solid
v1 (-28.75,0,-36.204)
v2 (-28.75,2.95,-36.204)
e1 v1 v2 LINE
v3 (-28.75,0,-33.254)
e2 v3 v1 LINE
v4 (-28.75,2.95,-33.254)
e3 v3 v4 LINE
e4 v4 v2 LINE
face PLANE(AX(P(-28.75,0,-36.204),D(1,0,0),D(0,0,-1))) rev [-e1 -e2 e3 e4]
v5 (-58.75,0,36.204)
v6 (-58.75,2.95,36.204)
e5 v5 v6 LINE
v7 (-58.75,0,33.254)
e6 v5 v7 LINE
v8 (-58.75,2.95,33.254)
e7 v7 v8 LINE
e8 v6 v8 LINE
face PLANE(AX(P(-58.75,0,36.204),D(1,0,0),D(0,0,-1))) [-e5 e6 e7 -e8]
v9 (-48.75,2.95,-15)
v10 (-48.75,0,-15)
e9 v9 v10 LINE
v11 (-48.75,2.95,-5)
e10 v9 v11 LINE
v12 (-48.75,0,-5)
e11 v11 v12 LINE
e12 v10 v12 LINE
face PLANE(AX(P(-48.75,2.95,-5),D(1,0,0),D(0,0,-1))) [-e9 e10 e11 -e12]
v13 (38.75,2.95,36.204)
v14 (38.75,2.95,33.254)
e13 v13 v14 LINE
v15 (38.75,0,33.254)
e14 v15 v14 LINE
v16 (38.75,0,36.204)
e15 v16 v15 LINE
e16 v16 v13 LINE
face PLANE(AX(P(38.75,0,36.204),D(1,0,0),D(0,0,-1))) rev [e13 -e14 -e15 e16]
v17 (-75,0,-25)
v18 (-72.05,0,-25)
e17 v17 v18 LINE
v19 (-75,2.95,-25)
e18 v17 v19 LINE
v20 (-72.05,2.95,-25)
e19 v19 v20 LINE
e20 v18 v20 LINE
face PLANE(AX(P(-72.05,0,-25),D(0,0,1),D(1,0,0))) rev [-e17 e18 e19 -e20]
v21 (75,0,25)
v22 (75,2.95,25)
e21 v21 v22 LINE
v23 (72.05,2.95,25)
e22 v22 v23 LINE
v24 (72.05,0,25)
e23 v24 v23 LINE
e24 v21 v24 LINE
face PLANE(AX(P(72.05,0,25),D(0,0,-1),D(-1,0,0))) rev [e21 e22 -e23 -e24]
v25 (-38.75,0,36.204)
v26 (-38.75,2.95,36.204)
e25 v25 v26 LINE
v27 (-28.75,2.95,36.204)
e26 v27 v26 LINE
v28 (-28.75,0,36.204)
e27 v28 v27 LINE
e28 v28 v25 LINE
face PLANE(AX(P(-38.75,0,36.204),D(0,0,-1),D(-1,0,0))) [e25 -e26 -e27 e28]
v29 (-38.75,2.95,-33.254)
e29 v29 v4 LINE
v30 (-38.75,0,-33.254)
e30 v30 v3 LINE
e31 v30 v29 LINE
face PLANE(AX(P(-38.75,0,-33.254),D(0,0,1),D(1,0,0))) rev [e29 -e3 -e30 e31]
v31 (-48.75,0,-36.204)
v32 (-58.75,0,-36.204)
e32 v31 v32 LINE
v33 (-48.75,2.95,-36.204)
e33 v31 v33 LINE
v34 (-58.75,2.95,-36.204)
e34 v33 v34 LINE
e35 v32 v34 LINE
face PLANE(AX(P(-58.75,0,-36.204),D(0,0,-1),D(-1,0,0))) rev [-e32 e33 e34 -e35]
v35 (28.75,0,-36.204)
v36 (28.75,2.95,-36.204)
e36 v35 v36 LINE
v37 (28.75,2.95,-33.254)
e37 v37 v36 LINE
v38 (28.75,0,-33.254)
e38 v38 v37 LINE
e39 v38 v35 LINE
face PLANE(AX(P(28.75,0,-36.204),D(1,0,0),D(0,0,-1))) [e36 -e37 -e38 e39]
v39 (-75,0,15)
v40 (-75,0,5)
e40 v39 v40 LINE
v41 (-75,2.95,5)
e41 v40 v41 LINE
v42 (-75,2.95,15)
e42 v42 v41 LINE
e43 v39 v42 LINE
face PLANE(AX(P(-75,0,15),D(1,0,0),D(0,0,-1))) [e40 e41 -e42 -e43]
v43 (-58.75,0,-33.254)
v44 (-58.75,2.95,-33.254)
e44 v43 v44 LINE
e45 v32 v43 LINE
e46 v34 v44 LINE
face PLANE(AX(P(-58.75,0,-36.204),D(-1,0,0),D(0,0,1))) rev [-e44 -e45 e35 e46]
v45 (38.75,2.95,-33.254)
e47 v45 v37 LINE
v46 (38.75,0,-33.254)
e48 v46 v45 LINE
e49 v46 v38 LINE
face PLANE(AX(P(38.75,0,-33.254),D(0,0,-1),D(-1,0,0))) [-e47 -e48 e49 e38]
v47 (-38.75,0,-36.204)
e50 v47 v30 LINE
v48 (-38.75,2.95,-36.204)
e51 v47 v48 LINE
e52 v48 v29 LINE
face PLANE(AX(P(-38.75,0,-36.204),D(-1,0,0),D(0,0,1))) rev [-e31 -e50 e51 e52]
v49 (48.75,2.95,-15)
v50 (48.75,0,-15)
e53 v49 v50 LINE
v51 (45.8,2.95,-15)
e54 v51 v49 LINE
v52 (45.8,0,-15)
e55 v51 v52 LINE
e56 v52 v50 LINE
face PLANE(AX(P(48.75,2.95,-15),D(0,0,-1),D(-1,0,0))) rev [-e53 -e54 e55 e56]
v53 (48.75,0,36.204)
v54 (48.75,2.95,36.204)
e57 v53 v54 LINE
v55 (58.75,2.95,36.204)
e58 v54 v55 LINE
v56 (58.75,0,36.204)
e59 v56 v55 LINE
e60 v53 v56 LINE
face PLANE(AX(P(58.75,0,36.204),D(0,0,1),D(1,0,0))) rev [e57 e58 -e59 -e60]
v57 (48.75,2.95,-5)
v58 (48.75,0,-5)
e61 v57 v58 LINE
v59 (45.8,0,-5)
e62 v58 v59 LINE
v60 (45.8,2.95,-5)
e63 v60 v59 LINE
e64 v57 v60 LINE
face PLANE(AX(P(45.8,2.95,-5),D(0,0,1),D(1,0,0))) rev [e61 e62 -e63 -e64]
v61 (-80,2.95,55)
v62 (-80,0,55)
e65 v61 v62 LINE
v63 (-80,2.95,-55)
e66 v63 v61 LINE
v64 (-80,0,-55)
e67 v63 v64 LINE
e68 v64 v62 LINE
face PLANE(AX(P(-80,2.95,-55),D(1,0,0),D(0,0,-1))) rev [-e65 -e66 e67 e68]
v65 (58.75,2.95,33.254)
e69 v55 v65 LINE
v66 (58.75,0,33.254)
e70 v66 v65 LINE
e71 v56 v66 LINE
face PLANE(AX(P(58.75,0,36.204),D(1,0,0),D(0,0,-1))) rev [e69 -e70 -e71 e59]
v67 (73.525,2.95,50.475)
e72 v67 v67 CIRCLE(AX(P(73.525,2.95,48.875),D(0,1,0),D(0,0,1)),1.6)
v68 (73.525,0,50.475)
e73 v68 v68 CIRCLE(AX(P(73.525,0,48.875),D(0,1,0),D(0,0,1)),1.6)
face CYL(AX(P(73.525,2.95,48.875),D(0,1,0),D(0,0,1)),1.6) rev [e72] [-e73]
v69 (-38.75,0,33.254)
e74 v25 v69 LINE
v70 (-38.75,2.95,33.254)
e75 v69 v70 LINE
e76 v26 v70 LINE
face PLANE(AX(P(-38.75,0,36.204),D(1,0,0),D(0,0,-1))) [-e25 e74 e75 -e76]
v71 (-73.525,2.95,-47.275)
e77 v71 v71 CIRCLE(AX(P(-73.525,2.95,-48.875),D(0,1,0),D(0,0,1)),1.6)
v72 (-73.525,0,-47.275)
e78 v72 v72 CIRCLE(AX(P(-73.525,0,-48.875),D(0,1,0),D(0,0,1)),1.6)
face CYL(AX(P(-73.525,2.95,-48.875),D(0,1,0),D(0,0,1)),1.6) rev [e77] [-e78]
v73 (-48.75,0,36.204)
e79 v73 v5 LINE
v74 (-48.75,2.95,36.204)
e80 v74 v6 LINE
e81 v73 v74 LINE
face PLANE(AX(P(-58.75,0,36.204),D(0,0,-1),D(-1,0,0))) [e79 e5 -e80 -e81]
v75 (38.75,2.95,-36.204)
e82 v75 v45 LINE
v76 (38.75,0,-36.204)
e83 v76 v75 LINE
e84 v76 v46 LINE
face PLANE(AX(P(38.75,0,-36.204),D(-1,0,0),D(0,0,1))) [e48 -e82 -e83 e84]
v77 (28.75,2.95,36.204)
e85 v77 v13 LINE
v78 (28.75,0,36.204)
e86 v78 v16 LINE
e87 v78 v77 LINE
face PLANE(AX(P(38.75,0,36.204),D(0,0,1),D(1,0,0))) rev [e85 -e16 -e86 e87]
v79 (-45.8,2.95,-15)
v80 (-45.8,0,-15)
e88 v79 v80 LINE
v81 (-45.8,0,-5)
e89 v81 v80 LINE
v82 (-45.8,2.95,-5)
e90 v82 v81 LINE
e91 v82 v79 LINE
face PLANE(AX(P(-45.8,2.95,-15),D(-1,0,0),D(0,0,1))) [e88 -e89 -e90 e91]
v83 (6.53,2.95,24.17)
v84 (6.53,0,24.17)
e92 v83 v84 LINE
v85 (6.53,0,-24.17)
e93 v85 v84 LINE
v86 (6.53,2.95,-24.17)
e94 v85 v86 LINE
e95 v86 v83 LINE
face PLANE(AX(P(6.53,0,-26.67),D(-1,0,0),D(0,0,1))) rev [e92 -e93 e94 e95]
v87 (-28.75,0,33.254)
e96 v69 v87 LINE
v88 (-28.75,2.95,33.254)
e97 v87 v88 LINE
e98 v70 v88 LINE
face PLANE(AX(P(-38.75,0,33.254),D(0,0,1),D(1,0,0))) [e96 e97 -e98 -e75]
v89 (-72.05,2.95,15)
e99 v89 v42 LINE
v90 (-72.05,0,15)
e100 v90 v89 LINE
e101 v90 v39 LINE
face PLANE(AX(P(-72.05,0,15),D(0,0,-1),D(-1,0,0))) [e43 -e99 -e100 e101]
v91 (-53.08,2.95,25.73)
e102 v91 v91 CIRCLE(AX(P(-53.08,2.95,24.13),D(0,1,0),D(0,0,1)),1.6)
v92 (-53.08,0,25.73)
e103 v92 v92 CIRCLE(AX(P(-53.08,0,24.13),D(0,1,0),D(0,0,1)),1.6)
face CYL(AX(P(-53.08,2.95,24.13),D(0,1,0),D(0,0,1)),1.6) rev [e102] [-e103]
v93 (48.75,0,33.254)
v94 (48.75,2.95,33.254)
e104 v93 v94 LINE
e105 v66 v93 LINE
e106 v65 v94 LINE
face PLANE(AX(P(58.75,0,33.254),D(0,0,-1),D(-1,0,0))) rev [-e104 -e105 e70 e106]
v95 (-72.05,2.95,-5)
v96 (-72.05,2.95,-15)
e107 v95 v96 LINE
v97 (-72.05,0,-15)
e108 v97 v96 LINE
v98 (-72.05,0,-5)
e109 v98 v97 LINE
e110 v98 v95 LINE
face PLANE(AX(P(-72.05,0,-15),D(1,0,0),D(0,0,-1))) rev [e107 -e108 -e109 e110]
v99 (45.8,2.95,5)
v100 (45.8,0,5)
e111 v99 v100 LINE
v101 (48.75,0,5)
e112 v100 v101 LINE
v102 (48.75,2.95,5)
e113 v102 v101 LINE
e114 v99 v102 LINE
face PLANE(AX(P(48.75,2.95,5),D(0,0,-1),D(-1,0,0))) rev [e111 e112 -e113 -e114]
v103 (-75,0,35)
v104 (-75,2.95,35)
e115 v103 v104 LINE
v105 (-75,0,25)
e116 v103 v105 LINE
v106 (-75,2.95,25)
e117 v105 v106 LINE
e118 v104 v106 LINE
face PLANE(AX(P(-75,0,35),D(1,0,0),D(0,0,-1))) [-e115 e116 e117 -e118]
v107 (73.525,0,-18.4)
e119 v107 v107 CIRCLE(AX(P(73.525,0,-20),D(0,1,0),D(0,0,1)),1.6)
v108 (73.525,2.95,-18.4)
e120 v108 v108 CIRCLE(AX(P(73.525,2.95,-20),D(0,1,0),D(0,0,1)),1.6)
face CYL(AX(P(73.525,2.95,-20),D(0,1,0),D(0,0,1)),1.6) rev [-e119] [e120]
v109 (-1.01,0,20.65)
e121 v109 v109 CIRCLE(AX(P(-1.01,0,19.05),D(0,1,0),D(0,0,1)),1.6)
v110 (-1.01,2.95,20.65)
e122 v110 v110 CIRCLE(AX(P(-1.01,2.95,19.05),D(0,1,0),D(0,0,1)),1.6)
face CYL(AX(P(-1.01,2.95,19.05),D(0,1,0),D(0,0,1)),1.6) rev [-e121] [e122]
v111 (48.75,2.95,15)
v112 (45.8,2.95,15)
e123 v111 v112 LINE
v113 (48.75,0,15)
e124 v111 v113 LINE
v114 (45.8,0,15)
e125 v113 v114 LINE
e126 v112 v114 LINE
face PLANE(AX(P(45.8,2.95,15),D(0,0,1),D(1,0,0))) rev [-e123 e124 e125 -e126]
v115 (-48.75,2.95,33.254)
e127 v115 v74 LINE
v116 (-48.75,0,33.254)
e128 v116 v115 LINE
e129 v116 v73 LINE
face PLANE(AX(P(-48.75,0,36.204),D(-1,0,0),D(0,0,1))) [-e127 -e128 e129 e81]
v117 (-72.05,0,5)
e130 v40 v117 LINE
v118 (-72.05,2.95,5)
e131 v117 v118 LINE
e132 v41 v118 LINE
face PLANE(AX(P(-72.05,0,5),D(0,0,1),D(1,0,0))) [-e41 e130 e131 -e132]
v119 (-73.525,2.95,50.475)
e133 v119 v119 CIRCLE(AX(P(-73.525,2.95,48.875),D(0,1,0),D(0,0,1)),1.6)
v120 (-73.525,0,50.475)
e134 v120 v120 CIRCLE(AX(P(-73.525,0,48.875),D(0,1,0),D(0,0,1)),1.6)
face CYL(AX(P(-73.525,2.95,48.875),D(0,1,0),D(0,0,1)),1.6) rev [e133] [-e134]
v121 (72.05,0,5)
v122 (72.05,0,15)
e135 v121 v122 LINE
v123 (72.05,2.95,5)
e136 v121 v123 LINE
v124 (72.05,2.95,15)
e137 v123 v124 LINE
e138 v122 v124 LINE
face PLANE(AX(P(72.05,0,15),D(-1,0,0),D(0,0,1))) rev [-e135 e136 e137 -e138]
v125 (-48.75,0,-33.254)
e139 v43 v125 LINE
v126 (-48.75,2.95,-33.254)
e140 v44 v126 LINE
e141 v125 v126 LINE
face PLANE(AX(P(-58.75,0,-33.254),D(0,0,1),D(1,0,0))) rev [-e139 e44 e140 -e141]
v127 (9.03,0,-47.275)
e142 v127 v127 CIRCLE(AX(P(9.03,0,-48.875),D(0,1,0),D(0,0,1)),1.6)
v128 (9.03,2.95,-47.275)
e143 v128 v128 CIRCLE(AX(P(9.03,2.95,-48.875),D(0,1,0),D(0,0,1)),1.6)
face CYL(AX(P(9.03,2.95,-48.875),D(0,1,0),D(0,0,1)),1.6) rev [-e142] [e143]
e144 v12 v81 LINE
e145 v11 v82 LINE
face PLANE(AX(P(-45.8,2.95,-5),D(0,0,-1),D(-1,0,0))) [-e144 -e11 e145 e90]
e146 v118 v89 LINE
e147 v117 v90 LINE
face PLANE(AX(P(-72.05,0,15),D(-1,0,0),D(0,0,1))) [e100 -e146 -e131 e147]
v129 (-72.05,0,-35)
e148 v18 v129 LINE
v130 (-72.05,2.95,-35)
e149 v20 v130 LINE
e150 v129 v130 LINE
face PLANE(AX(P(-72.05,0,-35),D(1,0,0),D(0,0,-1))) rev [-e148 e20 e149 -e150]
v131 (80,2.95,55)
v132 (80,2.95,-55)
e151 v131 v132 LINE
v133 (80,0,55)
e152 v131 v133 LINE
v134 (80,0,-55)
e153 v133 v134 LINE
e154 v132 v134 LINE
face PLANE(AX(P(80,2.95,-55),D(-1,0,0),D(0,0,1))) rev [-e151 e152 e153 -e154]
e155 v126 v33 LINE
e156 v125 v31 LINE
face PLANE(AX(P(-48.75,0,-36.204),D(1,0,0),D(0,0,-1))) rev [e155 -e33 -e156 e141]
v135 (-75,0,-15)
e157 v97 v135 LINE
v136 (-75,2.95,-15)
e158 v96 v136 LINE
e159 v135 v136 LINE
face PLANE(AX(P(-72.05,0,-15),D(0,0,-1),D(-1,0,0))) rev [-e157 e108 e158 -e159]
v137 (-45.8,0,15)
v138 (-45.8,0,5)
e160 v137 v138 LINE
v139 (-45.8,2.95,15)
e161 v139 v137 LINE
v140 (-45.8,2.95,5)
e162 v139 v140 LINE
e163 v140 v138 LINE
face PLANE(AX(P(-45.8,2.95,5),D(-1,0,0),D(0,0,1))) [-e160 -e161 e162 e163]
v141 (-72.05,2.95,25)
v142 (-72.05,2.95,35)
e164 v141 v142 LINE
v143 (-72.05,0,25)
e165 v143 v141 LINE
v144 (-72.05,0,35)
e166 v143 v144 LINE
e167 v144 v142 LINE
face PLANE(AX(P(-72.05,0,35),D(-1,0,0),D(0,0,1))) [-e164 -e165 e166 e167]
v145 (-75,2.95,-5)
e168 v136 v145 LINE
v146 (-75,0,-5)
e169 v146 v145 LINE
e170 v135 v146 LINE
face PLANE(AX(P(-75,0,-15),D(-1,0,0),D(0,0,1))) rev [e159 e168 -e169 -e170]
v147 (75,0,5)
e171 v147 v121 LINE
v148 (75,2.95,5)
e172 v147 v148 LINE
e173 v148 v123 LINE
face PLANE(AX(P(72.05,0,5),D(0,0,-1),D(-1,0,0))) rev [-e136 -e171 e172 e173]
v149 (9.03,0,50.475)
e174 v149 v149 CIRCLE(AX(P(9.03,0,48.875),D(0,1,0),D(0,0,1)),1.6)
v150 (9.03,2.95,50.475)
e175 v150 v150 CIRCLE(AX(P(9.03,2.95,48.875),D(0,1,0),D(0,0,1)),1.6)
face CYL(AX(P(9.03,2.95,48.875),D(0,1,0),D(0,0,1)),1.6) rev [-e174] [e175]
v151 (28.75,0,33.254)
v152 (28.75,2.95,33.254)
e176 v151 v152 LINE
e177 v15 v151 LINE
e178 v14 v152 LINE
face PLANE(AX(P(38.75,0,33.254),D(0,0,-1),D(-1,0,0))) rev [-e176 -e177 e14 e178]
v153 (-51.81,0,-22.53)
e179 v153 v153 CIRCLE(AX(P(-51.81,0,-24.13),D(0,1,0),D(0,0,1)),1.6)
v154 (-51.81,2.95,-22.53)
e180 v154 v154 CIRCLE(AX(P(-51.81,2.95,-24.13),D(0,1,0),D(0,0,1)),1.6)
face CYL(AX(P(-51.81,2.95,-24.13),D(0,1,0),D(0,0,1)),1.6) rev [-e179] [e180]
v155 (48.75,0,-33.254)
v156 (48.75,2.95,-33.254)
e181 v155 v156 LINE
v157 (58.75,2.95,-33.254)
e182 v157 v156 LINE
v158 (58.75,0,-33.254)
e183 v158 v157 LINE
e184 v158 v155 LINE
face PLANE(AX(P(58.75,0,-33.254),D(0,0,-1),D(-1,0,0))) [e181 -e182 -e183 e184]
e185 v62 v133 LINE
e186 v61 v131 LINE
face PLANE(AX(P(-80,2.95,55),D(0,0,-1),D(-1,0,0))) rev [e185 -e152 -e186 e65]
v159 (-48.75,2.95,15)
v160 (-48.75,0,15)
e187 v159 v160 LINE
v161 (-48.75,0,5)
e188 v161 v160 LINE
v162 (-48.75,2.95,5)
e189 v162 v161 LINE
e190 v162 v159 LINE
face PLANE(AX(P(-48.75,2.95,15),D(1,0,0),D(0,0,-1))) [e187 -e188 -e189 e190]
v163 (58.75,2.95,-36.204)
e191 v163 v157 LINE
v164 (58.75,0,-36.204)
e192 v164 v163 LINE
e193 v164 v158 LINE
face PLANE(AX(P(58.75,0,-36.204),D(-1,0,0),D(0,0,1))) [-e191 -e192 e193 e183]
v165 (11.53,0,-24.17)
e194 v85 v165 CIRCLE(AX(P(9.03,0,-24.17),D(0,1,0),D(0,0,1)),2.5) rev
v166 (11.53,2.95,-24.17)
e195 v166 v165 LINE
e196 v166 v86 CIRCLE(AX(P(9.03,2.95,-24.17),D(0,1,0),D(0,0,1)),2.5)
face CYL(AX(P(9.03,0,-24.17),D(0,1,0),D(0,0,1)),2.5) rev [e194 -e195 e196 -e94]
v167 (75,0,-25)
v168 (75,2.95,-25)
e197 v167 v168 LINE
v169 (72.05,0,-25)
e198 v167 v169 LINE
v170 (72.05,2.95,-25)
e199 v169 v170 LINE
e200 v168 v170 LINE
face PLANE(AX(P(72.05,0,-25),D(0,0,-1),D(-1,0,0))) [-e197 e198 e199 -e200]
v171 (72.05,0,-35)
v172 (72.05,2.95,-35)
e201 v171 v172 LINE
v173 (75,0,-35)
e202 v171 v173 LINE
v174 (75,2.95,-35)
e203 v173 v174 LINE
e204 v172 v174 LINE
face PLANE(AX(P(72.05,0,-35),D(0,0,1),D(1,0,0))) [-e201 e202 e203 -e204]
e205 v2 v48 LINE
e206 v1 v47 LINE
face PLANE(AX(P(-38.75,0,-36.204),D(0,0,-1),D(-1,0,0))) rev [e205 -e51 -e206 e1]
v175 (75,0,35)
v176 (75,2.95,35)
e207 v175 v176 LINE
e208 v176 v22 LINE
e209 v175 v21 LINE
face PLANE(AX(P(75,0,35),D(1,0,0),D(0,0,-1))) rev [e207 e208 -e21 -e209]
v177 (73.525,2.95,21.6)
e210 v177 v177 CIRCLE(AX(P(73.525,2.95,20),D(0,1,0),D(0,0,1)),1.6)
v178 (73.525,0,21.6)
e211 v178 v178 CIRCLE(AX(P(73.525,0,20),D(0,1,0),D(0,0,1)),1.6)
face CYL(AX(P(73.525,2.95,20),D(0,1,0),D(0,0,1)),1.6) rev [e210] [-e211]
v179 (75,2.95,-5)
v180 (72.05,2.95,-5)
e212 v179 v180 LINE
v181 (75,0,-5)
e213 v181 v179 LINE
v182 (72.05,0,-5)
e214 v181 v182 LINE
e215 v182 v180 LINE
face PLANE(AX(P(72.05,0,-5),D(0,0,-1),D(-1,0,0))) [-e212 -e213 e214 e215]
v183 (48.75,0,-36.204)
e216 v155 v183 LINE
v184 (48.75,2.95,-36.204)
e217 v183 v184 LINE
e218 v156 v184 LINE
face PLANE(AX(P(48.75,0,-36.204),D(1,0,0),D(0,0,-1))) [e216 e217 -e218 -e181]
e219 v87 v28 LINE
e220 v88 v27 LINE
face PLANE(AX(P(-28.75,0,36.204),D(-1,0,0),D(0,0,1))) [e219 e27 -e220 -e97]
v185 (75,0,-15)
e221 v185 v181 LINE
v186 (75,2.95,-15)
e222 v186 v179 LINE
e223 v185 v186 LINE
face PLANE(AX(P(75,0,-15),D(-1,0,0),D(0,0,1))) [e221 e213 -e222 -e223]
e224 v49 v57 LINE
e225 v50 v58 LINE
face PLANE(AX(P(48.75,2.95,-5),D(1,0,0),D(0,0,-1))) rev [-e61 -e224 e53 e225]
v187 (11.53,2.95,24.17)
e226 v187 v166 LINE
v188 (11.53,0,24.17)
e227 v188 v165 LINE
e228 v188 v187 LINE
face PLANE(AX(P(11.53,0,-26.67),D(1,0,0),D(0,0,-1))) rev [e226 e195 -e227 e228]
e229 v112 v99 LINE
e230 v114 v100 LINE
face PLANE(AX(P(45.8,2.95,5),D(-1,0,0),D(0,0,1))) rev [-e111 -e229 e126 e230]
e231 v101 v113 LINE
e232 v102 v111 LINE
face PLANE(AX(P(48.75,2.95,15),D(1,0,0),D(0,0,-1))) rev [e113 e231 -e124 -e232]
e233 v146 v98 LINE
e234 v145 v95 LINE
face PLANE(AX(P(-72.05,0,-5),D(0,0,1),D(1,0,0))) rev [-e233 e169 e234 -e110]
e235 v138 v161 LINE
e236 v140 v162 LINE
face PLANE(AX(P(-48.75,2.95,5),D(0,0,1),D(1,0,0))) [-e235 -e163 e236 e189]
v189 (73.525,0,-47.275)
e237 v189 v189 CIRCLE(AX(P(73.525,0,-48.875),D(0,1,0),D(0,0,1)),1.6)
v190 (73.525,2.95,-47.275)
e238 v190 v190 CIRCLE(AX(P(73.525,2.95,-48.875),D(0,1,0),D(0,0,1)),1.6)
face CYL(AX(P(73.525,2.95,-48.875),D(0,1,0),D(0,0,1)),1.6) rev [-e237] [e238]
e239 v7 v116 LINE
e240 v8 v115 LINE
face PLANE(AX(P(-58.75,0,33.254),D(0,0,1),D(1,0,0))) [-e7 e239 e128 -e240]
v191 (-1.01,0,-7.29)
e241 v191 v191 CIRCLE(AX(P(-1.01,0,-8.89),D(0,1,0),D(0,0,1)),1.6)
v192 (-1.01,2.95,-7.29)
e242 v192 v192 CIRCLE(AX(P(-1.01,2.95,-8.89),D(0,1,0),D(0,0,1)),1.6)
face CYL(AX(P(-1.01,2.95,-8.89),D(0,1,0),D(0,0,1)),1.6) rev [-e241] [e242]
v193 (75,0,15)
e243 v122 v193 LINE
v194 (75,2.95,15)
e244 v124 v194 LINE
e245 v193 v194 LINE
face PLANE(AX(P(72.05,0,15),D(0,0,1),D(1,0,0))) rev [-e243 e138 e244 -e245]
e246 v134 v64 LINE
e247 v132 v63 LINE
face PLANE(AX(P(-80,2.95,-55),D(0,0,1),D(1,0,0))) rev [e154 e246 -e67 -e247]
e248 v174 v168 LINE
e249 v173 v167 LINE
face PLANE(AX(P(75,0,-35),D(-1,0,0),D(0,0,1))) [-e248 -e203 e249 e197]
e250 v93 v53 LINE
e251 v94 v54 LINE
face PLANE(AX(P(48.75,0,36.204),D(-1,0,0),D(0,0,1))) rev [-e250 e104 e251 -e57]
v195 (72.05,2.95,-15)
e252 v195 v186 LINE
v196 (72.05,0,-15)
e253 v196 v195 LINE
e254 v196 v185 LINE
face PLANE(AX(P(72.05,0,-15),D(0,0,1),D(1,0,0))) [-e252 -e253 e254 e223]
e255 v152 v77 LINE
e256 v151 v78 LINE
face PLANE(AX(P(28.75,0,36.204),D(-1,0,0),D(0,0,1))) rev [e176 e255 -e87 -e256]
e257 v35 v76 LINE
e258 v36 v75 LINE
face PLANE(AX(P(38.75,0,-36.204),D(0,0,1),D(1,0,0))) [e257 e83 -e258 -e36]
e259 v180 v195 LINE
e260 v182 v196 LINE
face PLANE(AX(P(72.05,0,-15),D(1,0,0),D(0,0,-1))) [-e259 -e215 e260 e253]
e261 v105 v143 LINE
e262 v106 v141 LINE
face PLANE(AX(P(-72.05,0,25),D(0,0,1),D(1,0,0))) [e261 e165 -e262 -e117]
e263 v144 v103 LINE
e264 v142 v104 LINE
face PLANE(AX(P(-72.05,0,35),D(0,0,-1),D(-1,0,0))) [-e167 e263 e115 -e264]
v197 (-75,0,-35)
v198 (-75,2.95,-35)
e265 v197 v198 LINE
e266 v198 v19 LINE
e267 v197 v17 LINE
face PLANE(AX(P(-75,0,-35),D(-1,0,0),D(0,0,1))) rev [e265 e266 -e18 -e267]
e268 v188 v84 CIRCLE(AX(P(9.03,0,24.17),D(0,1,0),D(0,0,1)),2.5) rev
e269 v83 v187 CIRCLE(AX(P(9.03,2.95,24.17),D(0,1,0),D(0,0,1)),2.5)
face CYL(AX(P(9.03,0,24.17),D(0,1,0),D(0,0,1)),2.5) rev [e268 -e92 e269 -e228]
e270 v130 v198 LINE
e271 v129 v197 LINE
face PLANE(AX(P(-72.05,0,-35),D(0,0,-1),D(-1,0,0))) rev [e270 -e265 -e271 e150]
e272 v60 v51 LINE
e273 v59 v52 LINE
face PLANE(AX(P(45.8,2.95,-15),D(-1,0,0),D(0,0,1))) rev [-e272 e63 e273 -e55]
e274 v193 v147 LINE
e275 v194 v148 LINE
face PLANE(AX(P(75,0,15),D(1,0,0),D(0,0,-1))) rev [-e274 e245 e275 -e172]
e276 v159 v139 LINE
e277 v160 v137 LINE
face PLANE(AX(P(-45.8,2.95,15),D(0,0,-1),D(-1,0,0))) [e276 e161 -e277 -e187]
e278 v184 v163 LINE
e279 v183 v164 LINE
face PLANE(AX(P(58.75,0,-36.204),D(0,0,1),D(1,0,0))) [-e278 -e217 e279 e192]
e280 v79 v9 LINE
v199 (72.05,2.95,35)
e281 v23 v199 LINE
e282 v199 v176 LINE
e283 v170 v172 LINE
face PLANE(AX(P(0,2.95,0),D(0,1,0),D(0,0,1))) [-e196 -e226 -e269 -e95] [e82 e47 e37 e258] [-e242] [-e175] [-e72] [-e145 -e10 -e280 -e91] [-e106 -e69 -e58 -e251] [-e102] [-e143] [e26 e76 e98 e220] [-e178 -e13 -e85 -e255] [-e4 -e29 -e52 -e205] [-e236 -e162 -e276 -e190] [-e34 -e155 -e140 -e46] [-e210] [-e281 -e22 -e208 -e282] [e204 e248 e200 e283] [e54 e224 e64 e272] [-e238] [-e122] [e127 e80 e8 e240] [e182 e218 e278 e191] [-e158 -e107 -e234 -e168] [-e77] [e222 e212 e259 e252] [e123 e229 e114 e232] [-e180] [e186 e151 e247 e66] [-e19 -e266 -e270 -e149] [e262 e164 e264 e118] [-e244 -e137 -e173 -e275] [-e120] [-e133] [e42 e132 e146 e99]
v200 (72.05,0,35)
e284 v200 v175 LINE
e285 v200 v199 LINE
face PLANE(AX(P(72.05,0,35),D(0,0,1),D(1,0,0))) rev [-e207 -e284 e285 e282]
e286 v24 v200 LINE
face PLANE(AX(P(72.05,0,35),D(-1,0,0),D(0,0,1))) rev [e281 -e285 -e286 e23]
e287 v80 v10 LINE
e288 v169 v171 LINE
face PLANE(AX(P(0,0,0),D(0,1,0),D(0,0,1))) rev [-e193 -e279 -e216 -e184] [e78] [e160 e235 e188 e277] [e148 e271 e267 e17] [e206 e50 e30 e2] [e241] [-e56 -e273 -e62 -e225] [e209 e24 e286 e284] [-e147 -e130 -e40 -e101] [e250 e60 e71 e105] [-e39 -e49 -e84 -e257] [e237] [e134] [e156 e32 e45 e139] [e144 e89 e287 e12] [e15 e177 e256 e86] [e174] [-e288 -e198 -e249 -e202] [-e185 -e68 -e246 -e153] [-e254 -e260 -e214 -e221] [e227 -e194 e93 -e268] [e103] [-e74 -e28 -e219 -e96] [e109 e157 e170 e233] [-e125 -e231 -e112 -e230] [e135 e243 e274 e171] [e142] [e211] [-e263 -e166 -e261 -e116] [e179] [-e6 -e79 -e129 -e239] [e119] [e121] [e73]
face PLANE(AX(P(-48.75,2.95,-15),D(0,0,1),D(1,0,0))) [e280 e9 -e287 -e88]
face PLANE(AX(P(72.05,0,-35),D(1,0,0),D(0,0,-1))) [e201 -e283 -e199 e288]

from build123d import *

# Parameters (mm, degrees)
BOTTOM_PLATE_OUTLINE_W   = 160
BOTTOM_PLATE_OUTLINE_H   = 110
BOTTOM_PLATE_OUTLINE_R   = 1.6
BOTTOM_PLATE_OUTLINE_W_2 = 2.95
BOTTOM_PLATE_OUTLINE_H_2 = 10
BOTTOM_PLATE_OUTLINE_W_3 = 10
BOTTOM_PLATE_OUTLINE_H_3 = 2.95
BOTTOM_PLATE_DEPTH       = 2.95
M3_CLEARANCE_HOLE1_D     = 3.2
SKETCH6_W                = 5
SKETCH6_H                = 53.34
CUT_EXTRUDE1_DEPTH       = 98.127249009
FILLET1_R                = 2.5
FILLET2_R                = 2.5
M3_CLEARANCE_HOLE2_D     = 3.2
M3_CLEARANCE_HOLE3_D     = 3.2
SKETCH12_W               = 2.95
SKETCH12_H               = 10
CUT_EXTRUDE4_DEPTH       = 98.127249009


# Read off the part's stored shape, not the designer's step: Bottom Plate
with BuildPart() as part:
    # Bottom Plate outline → Bottom Plate (new body)
    with BuildSketch(Plane(origin=(0, 0, 0), x_dir=(1, 0, 0), z_dir=(0, 1, 0))):
        Rectangle(BOTTOM_PLATE_OUTLINE_W, BOTTOM_PLATE_OUTLINE_H)
        with Locations((-73.525, -48.875)):
            Circle(BOTTOM_PLATE_OUTLINE_R, mode=Mode.SUBTRACT)
        with Locations((-73.525, -30)):
            Rectangle(BOTTOM_PLATE_OUTLINE_W_2, BOTTOM_PLATE_OUTLINE_H_2, mode=Mode.SUBTRACT)
        with Locations((-53.75, -34.729)):
            Rectangle(BOTTOM_PLATE_OUTLINE_W_3, BOTTOM_PLATE_OUTLINE_H_3, mode=Mode.SUBTRACT)
        with Locations((-33.75, -34.729)):
            Rectangle(BOTTOM_PLATE_OUTLINE_W_3, BOTTOM_PLATE_OUTLINE_H_3, mode=Mode.SUBTRACT)
        with Locations((-73.525, -10)):
            Rectangle(BOTTOM_PLATE_OUTLINE_W_2, BOTTOM_PLATE_OUTLINE_H_2, mode=Mode.SUBTRACT)
        with Locations((33.75, -34.729)):
            Rectangle(BOTTOM_PLATE_OUTLINE_W_3, BOTTOM_PLATE_OUTLINE_H_3, mode=Mode.SUBTRACT)
        with Locations((73.525, -48.875)):
            Circle(BOTTOM_PLATE_OUTLINE_R, mode=Mode.SUBTRACT)
        with Locations((53.75, -34.729)):
            Rectangle(BOTTOM_PLATE_OUTLINE_W_3, BOTTOM_PLATE_OUTLINE_H_3, mode=Mode.SUBTRACT)
        with Locations((73.525, -30)):
            Rectangle(BOTTOM_PLATE_OUTLINE_W_2, BOTTOM_PLATE_OUTLINE_H_2, mode=Mode.SUBTRACT)
        with Locations((73.525, -10)):
            Rectangle(BOTTOM_PLATE_OUTLINE_W_2, BOTTOM_PLATE_OUTLINE_H_2, mode=Mode.SUBTRACT)
        with Locations((-73.525, 10)):
            Rectangle(BOTTOM_PLATE_OUTLINE_W_2, BOTTOM_PLATE_OUTLINE_H_2, mode=Mode.SUBTRACT)
        with Locations((-73.525, 30)):
            Rectangle(BOTTOM_PLATE_OUTLINE_W_2, BOTTOM_PLATE_OUTLINE_H_2, mode=Mode.SUBTRACT)
        with Locations((-53.75, 34.729)):
            Rectangle(BOTTOM_PLATE_OUTLINE_W_3, BOTTOM_PLATE_OUTLINE_H_3, mode=Mode.SUBTRACT)
        with Locations((-73.525, 48.875)):
            Circle(BOTTOM_PLATE_OUTLINE_R, mode=Mode.SUBTRACT)
        with Locations((-33.75, 34.729)):
            Rectangle(BOTTOM_PLATE_OUTLINE_W_3, BOTTOM_PLATE_OUTLINE_H_3, mode=Mode.SUBTRACT)
        with Locations((73.525, 10)):
            Rectangle(BOTTOM_PLATE_OUTLINE_W_2, BOTTOM_PLATE_OUTLINE_H_2, mode=Mode.SUBTRACT)
        with Locations((33.75, 34.729)):
            Rectangle(BOTTOM_PLATE_OUTLINE_W_3, BOTTOM_PLATE_OUTLINE_H_3, mode=Mode.SUBTRACT)
        with Locations((53.75, 34.729)):
            Rectangle(BOTTOM_PLATE_OUTLINE_W_3, BOTTOM_PLATE_OUTLINE_H_3, mode=Mode.SUBTRACT)
        with Locations((73.525, 30)):
            Rectangle(BOTTOM_PLATE_OUTLINE_W_2, BOTTOM_PLATE_OUTLINE_H_2, mode=Mode.SUBTRACT)
        with Locations((73.525, 48.875)):
            Circle(BOTTOM_PLATE_OUTLINE_R, mode=Mode.SUBTRACT)
    extrude(amount=BOTTOM_PLATE_DEPTH)

    # M3 Clearance Hole1 (through all)
    with Locations(Plane(origin=(0, 2.95, 0), x_dir=(1, 0, 0), z_dir=(0, 1, 0))):
        with Locations((-51.81, 24.13), (-53.08, -24.13), (-1.01, -19.05), (-1.01, 8.89)):
            Hole(M3_CLEARANCE_HOLE1_D / 2)

    # Sketch6 → Cut-Extrude1 (cut, through all)
    with BuildSketch(Plane(origin=(0, 2.95, 0), x_dir=(1, 0, 0), z_dir=(0, 1, 0))):
        with Locations((9.03, 0)):
            Rectangle(SKETCH6_W, SKETCH6_H)
    extrude(amount=-CUT_EXTRUDE1_DEPTH, mode=Mode.SUBTRACT)

    # Fillet1
    fillet1_edges = [part.edges().sort_by_distance(p)[0] for p in [
        (6.53, 1.475, -26.67),
        (11.53, 1.475, -26.67),
    ]]
    fillet(fillet1_edges, radius=FILLET1_R - 0.0001)  # a hair under: the kernel refuses the full size

    # Fillet2
    fillet2_edges = [part.edges().sort_by_distance(p)[0] for p in [
        (6.53, 1.475, 26.67),
        (11.53, 1.475, 26.67),
    ]]
    fillet(fillet2_edges, radius=FILLET2_R - 0.0001)  # a hair under: the kernel refuses the full size

    # M3 Clearance Hole2 (through all)
    with Locations(Plane(origin=(0, 2.95, 0), x_dir=(1, 0, 0), z_dir=(0, 1, 0))):
        with Locations((73.525, -20), (73.525, 20)):
            Hole(M3_CLEARANCE_HOLE2_D / 2)

    # M3 Clearance Hole3 (through all)
    with Locations(Plane(origin=(0, 2.95, 0), x_dir=(1, 0, 0), z_dir=(0, 1, 0))):
        with Locations((9.03, -48.875), (9.03, 48.875)):
            Hole(M3_CLEARANCE_HOLE3_D / 2)

    # Sketch12 → Cut-Extrude4 (cut, through all)
    with BuildSketch(Plane.XZ):
        with Locations((47.275, 10)):
            Rectangle(SKETCH12_W, SKETCH12_H)
        with Locations((47.275, -10)):
            Rectangle(SKETCH12_W, SKETCH12_H)
    cut_extrude4 = extrude(amount=-CUT_EXTRUDE4_DEPTH, mode=Mode.SUBTRACT)

    # Mirror1: Cut-Extrude4 across plane
    add(cut_extrude4.mirror(Plane(origin=(0, 0, 0), x_dir=(0, 0, 1), z_dir=(1, 0, 0))), mode=Mode.SUBTRACT)


solid = part.part
